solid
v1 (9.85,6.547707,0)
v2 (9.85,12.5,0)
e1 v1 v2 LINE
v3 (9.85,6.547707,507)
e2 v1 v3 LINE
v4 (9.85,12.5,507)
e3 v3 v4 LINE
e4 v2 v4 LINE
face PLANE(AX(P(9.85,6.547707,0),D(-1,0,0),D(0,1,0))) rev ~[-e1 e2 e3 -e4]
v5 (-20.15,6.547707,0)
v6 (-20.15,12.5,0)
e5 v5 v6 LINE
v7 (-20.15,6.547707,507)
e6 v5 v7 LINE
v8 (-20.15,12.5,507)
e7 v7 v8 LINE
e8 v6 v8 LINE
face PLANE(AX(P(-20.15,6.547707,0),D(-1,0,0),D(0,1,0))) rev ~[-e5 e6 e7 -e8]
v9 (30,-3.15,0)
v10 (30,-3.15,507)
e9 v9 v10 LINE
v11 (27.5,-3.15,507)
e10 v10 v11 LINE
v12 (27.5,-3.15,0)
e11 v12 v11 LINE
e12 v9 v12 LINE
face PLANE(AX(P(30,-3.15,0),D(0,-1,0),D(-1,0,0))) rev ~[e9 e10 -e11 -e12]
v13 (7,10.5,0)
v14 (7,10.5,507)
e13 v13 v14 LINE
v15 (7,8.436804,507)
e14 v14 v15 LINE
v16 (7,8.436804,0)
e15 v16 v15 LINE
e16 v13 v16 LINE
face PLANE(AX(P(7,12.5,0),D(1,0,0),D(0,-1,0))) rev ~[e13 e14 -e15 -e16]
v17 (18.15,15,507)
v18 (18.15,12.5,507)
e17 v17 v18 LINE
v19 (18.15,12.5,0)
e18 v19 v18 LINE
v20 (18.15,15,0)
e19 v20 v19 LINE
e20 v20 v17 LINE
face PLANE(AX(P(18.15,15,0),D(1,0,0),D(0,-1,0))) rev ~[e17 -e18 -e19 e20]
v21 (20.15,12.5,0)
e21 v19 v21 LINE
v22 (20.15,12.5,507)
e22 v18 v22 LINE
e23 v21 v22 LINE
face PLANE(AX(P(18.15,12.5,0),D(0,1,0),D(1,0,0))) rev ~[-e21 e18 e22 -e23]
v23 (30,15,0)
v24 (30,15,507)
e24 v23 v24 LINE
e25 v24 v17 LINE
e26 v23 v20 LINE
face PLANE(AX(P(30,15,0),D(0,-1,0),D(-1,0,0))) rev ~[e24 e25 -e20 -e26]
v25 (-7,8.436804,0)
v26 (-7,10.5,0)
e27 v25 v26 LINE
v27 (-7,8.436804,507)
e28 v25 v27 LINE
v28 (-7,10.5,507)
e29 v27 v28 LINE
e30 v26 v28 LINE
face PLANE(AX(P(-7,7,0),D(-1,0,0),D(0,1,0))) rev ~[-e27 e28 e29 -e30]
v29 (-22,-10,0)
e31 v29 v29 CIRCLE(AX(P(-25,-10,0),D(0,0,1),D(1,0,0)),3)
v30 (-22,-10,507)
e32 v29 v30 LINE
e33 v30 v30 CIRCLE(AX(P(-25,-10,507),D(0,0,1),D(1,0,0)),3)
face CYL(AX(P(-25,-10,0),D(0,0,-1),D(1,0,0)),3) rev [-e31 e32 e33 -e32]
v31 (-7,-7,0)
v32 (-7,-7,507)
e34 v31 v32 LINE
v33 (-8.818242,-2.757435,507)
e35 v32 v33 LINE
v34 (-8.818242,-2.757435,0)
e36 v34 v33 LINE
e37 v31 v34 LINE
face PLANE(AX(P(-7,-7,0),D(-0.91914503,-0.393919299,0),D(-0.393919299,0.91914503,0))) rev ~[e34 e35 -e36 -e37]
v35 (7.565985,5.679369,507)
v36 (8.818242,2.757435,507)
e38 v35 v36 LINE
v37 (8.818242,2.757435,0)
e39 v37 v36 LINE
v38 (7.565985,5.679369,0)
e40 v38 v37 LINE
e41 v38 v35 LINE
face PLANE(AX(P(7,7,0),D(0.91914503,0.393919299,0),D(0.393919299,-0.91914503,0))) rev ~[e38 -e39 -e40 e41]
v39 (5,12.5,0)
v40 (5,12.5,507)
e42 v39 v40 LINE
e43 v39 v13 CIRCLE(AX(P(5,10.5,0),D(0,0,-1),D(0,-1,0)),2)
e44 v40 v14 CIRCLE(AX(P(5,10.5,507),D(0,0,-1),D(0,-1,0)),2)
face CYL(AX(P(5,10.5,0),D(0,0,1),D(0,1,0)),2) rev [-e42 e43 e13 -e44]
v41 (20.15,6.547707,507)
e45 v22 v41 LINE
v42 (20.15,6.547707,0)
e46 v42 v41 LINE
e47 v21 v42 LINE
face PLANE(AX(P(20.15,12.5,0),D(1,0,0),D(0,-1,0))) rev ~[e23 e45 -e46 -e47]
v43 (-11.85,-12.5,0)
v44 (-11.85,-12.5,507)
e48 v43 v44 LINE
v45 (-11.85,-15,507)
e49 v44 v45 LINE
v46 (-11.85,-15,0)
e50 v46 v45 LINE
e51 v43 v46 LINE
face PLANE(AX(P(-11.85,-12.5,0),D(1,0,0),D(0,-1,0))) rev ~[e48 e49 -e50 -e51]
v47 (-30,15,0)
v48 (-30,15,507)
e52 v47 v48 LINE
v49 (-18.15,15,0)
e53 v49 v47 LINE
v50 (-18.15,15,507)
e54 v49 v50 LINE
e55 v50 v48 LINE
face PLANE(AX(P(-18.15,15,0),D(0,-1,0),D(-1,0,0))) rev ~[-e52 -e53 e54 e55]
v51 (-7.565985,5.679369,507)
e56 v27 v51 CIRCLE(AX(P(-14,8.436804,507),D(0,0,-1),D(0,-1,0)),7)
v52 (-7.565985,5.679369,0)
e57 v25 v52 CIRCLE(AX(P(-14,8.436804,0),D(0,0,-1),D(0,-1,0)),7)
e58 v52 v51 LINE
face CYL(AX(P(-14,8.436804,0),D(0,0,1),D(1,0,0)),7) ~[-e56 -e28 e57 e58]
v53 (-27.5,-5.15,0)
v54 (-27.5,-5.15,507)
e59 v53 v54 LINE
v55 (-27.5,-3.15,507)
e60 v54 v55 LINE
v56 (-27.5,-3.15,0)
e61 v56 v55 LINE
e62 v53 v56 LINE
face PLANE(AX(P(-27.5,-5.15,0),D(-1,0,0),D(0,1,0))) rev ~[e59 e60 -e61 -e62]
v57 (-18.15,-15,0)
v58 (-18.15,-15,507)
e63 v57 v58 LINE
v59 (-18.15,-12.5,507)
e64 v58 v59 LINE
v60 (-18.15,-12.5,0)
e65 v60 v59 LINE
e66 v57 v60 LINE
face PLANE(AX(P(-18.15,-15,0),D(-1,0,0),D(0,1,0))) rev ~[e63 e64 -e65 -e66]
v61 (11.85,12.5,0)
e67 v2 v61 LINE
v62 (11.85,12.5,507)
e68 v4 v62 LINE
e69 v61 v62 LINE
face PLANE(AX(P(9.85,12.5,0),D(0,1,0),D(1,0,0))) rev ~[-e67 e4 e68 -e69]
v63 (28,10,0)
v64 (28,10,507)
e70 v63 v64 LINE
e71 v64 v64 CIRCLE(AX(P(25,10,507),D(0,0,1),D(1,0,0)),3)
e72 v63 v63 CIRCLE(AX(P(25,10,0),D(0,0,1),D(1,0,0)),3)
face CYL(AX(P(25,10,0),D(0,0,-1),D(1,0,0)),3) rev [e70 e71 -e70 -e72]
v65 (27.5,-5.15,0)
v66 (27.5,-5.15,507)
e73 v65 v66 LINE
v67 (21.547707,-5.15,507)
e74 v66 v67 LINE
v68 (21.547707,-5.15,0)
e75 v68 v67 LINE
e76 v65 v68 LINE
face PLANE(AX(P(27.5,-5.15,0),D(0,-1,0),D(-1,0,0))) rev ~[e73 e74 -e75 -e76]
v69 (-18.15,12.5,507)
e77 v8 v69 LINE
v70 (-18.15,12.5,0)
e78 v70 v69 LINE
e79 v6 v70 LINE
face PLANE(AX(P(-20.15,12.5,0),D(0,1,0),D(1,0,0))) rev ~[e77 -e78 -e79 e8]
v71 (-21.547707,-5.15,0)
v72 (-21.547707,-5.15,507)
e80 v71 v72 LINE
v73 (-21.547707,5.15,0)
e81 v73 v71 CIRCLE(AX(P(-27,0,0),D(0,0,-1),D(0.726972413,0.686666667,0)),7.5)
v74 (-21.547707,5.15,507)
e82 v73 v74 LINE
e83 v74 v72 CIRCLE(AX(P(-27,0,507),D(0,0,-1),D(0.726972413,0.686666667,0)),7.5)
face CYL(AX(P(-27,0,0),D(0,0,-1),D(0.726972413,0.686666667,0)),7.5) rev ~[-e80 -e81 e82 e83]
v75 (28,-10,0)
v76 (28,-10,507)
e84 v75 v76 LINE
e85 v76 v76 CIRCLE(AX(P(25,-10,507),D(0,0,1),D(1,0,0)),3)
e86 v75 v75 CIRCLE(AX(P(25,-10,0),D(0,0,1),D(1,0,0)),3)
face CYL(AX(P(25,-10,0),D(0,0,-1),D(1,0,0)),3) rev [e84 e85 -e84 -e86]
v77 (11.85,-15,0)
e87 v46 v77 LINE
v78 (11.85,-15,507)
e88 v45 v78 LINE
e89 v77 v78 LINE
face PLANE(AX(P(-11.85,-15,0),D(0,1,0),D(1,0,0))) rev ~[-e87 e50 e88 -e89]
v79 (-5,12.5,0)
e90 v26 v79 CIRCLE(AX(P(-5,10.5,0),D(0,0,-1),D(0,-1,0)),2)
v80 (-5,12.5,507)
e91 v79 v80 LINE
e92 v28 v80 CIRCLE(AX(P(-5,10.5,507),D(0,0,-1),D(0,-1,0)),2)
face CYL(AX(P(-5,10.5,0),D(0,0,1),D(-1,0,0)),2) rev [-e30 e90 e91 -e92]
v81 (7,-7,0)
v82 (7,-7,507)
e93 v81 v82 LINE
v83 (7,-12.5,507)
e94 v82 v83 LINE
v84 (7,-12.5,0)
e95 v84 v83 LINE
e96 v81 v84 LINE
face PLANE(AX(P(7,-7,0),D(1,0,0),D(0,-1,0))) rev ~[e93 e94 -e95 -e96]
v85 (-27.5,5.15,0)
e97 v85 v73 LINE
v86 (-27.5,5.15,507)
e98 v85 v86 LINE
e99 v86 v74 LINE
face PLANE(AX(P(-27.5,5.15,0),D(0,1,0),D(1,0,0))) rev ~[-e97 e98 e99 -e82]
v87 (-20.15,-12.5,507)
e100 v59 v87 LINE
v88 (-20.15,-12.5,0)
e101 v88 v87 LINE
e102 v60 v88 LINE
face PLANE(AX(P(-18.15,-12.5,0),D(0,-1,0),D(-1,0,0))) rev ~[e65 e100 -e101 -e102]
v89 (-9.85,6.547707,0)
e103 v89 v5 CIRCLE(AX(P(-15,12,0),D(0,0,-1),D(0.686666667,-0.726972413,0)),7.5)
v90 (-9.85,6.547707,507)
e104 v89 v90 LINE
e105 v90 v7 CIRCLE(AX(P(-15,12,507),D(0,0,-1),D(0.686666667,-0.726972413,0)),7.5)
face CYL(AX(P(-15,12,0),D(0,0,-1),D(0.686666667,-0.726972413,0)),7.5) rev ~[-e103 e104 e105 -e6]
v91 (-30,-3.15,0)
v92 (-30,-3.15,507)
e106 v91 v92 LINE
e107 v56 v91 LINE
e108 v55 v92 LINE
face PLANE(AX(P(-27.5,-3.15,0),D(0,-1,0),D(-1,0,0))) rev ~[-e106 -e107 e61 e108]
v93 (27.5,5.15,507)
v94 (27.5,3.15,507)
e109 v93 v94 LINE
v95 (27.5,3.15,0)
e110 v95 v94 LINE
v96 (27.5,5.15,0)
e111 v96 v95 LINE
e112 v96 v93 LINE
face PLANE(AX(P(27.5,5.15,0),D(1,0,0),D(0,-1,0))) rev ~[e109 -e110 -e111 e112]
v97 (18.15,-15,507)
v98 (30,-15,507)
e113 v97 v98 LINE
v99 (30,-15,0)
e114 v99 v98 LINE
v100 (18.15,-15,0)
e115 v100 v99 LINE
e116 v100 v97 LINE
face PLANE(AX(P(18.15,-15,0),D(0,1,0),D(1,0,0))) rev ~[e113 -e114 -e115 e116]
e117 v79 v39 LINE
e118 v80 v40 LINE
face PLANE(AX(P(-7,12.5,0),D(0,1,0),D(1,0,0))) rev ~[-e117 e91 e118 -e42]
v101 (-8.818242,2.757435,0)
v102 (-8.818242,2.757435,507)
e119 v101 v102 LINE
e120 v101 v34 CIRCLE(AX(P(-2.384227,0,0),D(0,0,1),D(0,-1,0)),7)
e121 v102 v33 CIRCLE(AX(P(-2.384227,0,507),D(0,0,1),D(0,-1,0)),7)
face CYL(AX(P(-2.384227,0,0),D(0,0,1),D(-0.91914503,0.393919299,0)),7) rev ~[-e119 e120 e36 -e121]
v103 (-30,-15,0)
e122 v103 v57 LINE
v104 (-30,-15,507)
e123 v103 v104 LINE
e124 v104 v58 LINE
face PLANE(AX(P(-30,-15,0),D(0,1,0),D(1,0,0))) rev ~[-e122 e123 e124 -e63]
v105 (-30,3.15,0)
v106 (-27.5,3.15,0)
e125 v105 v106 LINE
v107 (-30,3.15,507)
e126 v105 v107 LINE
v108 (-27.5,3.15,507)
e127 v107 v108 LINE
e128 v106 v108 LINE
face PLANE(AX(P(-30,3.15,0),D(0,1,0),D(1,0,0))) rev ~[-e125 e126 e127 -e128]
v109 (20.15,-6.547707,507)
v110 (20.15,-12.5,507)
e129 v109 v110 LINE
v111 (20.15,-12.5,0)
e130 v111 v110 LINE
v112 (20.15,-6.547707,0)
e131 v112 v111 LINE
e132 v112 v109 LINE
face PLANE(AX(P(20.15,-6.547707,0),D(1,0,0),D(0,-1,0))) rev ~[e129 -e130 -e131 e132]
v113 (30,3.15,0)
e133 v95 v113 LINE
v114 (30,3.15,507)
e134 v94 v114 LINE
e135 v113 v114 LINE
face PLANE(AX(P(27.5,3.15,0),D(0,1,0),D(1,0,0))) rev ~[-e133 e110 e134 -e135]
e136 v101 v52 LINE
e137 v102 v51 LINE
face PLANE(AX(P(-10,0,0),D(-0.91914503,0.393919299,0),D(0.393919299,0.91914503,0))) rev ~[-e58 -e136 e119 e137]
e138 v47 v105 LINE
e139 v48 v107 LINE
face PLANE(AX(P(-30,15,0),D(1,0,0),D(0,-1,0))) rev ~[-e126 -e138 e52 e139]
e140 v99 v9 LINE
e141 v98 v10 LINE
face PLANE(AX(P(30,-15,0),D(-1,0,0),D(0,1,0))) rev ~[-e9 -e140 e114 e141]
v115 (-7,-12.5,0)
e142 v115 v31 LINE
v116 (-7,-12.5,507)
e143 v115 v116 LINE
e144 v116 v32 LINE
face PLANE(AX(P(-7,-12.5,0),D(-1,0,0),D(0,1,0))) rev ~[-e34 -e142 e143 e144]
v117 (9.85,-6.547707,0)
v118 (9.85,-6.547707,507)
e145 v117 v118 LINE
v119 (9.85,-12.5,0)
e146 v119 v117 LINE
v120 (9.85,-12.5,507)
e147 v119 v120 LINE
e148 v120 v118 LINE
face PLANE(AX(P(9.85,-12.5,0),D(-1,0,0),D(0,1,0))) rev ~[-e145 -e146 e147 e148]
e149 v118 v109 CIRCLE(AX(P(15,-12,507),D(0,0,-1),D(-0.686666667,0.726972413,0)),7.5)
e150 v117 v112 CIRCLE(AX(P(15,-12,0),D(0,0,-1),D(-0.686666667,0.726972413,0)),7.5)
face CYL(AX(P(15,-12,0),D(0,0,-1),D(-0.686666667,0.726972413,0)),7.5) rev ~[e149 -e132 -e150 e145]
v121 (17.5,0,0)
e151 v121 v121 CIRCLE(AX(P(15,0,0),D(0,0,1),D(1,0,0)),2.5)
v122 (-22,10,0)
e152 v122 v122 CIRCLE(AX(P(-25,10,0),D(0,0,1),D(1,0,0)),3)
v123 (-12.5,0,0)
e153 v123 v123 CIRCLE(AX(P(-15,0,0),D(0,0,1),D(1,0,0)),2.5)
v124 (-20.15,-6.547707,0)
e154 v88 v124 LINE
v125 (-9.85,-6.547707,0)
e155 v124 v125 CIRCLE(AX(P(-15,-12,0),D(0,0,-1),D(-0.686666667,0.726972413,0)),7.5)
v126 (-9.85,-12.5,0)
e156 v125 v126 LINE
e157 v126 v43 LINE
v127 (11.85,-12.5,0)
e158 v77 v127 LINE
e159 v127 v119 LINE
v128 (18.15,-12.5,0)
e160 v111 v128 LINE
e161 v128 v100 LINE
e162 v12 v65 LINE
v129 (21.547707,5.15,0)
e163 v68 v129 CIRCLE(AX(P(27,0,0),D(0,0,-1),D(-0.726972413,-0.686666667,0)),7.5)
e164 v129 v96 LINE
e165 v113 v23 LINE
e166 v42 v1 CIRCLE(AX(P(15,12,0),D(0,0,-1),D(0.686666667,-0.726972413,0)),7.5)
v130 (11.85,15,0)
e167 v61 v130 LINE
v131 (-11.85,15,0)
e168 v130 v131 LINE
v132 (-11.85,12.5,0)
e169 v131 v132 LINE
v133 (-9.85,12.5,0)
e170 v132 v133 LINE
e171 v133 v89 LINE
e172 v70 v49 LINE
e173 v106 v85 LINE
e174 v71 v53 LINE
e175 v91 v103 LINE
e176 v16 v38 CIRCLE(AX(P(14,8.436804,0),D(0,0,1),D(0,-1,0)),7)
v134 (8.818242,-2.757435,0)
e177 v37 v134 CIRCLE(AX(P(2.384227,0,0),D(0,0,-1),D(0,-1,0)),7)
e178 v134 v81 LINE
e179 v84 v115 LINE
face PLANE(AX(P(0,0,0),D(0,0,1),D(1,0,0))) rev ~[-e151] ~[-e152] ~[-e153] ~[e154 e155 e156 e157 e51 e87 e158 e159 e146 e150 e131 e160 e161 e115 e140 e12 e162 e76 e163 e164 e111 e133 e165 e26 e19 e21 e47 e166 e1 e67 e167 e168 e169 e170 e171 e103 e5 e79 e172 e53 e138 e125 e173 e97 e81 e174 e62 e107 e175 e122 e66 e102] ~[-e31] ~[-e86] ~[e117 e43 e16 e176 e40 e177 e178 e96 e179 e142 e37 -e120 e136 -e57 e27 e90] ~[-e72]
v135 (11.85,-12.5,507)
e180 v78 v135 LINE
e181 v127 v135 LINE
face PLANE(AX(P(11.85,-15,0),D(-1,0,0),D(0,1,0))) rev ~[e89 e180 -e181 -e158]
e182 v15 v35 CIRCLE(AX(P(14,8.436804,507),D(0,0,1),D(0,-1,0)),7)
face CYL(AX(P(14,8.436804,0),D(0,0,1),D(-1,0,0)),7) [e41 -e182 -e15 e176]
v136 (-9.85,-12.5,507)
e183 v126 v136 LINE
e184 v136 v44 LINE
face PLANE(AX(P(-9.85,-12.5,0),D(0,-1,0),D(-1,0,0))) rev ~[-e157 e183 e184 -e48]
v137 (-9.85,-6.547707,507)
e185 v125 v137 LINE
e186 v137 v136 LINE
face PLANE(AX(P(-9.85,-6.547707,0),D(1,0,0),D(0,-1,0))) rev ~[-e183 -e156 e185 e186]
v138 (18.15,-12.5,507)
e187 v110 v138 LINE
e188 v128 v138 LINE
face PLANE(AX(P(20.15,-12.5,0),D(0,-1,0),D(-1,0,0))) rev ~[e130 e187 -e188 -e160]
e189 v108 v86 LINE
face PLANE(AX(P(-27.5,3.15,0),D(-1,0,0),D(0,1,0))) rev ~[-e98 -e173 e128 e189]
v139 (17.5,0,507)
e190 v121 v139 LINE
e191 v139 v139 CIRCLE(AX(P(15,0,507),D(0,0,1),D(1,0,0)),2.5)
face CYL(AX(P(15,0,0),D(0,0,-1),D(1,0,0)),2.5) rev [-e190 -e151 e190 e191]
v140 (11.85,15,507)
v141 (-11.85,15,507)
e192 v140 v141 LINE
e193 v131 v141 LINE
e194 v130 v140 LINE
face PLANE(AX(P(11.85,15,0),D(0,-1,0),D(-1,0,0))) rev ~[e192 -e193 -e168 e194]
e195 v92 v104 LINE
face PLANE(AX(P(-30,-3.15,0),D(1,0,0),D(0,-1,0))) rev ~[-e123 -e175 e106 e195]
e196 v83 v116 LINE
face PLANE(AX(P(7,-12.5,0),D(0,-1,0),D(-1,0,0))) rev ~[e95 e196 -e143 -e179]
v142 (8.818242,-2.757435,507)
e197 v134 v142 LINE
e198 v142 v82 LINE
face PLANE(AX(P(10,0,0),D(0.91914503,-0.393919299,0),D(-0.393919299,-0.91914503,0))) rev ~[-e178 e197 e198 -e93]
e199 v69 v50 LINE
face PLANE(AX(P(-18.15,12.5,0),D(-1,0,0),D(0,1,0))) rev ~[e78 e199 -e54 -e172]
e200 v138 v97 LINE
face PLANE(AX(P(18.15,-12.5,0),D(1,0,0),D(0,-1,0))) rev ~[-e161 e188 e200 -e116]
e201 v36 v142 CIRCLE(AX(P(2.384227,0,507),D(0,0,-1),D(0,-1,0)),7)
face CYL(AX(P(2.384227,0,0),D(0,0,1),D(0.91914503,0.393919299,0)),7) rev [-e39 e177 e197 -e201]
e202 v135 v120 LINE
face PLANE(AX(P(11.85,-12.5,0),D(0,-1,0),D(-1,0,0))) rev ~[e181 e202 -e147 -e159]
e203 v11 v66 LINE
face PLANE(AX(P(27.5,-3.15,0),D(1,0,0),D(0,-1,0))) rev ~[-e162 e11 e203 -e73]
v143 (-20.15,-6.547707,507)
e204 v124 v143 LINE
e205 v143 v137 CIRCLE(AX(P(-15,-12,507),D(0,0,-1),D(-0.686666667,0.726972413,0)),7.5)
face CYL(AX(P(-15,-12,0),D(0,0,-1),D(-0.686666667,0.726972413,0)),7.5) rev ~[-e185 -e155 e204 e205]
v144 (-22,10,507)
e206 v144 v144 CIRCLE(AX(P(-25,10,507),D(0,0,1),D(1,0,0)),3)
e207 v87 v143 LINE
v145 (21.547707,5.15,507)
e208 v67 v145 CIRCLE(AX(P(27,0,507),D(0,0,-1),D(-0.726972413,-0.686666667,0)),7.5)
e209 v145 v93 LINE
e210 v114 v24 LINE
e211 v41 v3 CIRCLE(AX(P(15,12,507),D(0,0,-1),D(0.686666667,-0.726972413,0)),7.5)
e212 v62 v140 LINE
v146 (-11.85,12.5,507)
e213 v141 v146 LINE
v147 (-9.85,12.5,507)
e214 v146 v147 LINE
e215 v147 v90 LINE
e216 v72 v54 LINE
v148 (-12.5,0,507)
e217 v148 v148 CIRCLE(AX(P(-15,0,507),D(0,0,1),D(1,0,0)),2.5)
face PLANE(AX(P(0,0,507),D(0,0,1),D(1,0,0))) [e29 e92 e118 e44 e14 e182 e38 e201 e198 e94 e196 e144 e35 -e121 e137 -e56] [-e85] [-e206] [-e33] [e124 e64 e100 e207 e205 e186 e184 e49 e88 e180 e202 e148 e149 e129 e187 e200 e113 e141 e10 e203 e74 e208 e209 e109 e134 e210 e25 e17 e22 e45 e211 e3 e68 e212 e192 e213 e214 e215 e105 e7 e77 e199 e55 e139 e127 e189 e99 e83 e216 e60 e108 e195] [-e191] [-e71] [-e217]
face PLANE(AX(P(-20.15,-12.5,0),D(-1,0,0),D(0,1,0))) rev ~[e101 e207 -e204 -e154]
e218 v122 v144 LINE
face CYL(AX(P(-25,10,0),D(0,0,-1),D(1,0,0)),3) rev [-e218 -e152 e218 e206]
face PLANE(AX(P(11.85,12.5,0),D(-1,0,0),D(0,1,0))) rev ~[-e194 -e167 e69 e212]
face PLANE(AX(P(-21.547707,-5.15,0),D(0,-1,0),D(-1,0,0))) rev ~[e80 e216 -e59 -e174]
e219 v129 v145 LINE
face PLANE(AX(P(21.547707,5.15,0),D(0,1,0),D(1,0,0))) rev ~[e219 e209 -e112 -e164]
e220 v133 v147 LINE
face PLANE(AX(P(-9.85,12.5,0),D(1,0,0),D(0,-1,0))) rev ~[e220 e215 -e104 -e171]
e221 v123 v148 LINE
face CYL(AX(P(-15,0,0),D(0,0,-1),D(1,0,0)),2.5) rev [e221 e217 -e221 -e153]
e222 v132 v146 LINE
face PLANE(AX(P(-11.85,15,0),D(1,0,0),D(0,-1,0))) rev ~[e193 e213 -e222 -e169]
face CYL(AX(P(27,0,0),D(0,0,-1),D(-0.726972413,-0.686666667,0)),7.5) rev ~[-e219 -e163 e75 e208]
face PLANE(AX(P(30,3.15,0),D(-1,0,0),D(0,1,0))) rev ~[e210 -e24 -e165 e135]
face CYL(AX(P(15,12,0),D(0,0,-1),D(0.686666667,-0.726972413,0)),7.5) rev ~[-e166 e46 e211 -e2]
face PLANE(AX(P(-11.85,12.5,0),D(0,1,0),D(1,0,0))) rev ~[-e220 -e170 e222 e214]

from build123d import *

# Parameters (mm, degrees)
F0_R     = 3
F0_R_2   = 2.5
F1_DEPTH = 507
F2_R     = 2
F3_R     = 7


# Not quite as in the source:
# - a feature names something its author has since deleted; it is built from what else it names


with BuildPart() as f1:
    # F0 (on Top) → F1 (new body)
    with BuildSketch(Plane.XY):
        with BuildLine():
            Line((18.15, -15), (30, -15))
            Line((30, -15), (30, -3.15))
            Line((30, -3.15), (27.5, -3.15))
            Line((27.5, -3.15), (27.5, -5.15))
            Line((27.5, -5.15), (21.5477069044, -5.15))
            ThreePointArc((21.5477069044, -5.15), (19.5, 0), (21.5477069044, 5.15))
            Line((21.5477069044, 5.15), (27.5, 5.15))
            Line((27.5, 5.15), (27.5, 3.15))
            Line((27.5, 3.15), (30, 3.15))
            Line((30, 3.15), (30, 15))
            Line((30, 15), (18.15, 15))
            Line((18.15, 15), (18.15, 12.5))
            Line((18.15, 12.5), (20.15, 12.5))
            Line((20.15, 12.5), (20.15, 6.5477069044))
            ThreePointArc((20.15, 6.5477069044), (15, 4.5), (9.85, 6.5477069044))
            Line((9.85, 6.5477069044), (9.85, 12.5))
            Line((9.85, 12.5), (11.85, 12.5))
            Line((11.85, 12.5), (11.85, 15))
            Line((11.85, 15), (-11.85, 15))
            Line((-11.85, 15), (-11.85, 12.5))
            Line((-11.85, 12.5), (-9.85, 12.5))
            Line((-9.85, 12.5), (-9.85, 6.5477069044))
            ThreePointArc((-9.85, 6.5477069044), (-15, 4.5), (-20.15, 6.5477069044))
            Line((-20.15, 6.5477069044), (-20.15, 12.5))
            Line((-20.15, 12.5), (-18.15, 12.5))
            Line((-18.15, 12.5), (-18.15, 15))
            Line((-18.15, 15), (-30, 15))
            Line((-30, 15), (-30, 3.15))
            Line((-30, 3.15), (-27.5, 3.15))
            Line((-27.5, 3.15), (-27.5, 5.15))
            Line((-27.5, 5.15), (-21.5477069044, 5.15))
            ThreePointArc((-21.5477069044, 5.15), (-19.5, 0), (-21.5477069044, -5.15))
            Line((-21.5477069044, -5.15), (-27.5, -5.15))
            Line((-27.5, -5.15), (-27.5, -3.15))
            Line((-27.5, -3.15), (-30, -3.15))
            Line((-30, -3.15), (-30, -15))
            Line((-30, -15), (-18.15, -15))
            Line((-18.15, -15), (-18.15, -12.5))
            Line((-18.15, -12.5), (-20.15, -12.5))
            Line((-20.15, -12.5), (-20.15, -6.5477069044))
            ThreePointArc((-20.15, -6.5477069044), (-15, -4.5), (-9.85, -6.5477069044))
            Line((-9.85, -6.5477069044), (-9.85, -12.5))
            Line((-9.85, -12.5), (-11.85, -12.5))
            Line((-11.85, -12.5), (-11.85, -15))
            Line((-11.85, -15), (11.85, -15))
            Line((11.85, -15), (11.85, -12.5))
            Line((11.85, -12.5), (9.85, -12.5))
            Line((9.85, -12.5), (9.85, -6.5477069044))
            ThreePointArc((9.85, -6.5477069044), (15, -4.5), (20.15, -6.5477069044))
            Line((20.15, -6.5477069044), (20.15, -12.5))
            Line((20.15, -12.5), (18.15, -12.5))
            Line((18.15, -12.5), (18.15, -15))
        make_face()
        with Locations((-25, -10)):
            Circle(F0_R, mode=Mode.SUBTRACT)
        with Locations((25, -10)):
            Circle(F0_R, mode=Mode.SUBTRACT)
        with Locations((-15, 0)):
            Circle(F0_R_2, mode=Mode.SUBTRACT)
        with Locations((-25, 10)):
            Circle(F0_R, mode=Mode.SUBTRACT)
        Polygon((-7, 7), (-7, 12.5), (0, 12.5), (7, 12.5), (7, 7), (10, 0), (7, -7), (7, -12.5), (0, -12.5), (-7, -12.5), (-7, -7), (-10, 0), align=None, mode=Mode.SUBTRACT)
        with Locations((15, 0)):
            Circle(F0_R_2, mode=Mode.SUBTRACT)
        with Locations((25, 10)):
            Circle(F0_R, mode=Mode.SUBTRACT)
    extrude(amount=F1_DEPTH)

    # F2
    f2_edges = [f1.edges().sort_by_distance(p)[0] for p in [
        (-7, 12.5, 253.5),
        (7, 12.5, 253.5),
    ]]
    fillet(f2_edges, radius=F2_R)

    # F3
    f3_edges = [f1.edges().sort_by_distance(p)[0] for p in [
        (-7, 7, 253.5),
        (-10, 0, 253.5),
        (7, 7, 253.5),
        (10, 0, 253.5),
    ]]
    fillet(f3_edges, radius=F3_R)


solid = f1.part
